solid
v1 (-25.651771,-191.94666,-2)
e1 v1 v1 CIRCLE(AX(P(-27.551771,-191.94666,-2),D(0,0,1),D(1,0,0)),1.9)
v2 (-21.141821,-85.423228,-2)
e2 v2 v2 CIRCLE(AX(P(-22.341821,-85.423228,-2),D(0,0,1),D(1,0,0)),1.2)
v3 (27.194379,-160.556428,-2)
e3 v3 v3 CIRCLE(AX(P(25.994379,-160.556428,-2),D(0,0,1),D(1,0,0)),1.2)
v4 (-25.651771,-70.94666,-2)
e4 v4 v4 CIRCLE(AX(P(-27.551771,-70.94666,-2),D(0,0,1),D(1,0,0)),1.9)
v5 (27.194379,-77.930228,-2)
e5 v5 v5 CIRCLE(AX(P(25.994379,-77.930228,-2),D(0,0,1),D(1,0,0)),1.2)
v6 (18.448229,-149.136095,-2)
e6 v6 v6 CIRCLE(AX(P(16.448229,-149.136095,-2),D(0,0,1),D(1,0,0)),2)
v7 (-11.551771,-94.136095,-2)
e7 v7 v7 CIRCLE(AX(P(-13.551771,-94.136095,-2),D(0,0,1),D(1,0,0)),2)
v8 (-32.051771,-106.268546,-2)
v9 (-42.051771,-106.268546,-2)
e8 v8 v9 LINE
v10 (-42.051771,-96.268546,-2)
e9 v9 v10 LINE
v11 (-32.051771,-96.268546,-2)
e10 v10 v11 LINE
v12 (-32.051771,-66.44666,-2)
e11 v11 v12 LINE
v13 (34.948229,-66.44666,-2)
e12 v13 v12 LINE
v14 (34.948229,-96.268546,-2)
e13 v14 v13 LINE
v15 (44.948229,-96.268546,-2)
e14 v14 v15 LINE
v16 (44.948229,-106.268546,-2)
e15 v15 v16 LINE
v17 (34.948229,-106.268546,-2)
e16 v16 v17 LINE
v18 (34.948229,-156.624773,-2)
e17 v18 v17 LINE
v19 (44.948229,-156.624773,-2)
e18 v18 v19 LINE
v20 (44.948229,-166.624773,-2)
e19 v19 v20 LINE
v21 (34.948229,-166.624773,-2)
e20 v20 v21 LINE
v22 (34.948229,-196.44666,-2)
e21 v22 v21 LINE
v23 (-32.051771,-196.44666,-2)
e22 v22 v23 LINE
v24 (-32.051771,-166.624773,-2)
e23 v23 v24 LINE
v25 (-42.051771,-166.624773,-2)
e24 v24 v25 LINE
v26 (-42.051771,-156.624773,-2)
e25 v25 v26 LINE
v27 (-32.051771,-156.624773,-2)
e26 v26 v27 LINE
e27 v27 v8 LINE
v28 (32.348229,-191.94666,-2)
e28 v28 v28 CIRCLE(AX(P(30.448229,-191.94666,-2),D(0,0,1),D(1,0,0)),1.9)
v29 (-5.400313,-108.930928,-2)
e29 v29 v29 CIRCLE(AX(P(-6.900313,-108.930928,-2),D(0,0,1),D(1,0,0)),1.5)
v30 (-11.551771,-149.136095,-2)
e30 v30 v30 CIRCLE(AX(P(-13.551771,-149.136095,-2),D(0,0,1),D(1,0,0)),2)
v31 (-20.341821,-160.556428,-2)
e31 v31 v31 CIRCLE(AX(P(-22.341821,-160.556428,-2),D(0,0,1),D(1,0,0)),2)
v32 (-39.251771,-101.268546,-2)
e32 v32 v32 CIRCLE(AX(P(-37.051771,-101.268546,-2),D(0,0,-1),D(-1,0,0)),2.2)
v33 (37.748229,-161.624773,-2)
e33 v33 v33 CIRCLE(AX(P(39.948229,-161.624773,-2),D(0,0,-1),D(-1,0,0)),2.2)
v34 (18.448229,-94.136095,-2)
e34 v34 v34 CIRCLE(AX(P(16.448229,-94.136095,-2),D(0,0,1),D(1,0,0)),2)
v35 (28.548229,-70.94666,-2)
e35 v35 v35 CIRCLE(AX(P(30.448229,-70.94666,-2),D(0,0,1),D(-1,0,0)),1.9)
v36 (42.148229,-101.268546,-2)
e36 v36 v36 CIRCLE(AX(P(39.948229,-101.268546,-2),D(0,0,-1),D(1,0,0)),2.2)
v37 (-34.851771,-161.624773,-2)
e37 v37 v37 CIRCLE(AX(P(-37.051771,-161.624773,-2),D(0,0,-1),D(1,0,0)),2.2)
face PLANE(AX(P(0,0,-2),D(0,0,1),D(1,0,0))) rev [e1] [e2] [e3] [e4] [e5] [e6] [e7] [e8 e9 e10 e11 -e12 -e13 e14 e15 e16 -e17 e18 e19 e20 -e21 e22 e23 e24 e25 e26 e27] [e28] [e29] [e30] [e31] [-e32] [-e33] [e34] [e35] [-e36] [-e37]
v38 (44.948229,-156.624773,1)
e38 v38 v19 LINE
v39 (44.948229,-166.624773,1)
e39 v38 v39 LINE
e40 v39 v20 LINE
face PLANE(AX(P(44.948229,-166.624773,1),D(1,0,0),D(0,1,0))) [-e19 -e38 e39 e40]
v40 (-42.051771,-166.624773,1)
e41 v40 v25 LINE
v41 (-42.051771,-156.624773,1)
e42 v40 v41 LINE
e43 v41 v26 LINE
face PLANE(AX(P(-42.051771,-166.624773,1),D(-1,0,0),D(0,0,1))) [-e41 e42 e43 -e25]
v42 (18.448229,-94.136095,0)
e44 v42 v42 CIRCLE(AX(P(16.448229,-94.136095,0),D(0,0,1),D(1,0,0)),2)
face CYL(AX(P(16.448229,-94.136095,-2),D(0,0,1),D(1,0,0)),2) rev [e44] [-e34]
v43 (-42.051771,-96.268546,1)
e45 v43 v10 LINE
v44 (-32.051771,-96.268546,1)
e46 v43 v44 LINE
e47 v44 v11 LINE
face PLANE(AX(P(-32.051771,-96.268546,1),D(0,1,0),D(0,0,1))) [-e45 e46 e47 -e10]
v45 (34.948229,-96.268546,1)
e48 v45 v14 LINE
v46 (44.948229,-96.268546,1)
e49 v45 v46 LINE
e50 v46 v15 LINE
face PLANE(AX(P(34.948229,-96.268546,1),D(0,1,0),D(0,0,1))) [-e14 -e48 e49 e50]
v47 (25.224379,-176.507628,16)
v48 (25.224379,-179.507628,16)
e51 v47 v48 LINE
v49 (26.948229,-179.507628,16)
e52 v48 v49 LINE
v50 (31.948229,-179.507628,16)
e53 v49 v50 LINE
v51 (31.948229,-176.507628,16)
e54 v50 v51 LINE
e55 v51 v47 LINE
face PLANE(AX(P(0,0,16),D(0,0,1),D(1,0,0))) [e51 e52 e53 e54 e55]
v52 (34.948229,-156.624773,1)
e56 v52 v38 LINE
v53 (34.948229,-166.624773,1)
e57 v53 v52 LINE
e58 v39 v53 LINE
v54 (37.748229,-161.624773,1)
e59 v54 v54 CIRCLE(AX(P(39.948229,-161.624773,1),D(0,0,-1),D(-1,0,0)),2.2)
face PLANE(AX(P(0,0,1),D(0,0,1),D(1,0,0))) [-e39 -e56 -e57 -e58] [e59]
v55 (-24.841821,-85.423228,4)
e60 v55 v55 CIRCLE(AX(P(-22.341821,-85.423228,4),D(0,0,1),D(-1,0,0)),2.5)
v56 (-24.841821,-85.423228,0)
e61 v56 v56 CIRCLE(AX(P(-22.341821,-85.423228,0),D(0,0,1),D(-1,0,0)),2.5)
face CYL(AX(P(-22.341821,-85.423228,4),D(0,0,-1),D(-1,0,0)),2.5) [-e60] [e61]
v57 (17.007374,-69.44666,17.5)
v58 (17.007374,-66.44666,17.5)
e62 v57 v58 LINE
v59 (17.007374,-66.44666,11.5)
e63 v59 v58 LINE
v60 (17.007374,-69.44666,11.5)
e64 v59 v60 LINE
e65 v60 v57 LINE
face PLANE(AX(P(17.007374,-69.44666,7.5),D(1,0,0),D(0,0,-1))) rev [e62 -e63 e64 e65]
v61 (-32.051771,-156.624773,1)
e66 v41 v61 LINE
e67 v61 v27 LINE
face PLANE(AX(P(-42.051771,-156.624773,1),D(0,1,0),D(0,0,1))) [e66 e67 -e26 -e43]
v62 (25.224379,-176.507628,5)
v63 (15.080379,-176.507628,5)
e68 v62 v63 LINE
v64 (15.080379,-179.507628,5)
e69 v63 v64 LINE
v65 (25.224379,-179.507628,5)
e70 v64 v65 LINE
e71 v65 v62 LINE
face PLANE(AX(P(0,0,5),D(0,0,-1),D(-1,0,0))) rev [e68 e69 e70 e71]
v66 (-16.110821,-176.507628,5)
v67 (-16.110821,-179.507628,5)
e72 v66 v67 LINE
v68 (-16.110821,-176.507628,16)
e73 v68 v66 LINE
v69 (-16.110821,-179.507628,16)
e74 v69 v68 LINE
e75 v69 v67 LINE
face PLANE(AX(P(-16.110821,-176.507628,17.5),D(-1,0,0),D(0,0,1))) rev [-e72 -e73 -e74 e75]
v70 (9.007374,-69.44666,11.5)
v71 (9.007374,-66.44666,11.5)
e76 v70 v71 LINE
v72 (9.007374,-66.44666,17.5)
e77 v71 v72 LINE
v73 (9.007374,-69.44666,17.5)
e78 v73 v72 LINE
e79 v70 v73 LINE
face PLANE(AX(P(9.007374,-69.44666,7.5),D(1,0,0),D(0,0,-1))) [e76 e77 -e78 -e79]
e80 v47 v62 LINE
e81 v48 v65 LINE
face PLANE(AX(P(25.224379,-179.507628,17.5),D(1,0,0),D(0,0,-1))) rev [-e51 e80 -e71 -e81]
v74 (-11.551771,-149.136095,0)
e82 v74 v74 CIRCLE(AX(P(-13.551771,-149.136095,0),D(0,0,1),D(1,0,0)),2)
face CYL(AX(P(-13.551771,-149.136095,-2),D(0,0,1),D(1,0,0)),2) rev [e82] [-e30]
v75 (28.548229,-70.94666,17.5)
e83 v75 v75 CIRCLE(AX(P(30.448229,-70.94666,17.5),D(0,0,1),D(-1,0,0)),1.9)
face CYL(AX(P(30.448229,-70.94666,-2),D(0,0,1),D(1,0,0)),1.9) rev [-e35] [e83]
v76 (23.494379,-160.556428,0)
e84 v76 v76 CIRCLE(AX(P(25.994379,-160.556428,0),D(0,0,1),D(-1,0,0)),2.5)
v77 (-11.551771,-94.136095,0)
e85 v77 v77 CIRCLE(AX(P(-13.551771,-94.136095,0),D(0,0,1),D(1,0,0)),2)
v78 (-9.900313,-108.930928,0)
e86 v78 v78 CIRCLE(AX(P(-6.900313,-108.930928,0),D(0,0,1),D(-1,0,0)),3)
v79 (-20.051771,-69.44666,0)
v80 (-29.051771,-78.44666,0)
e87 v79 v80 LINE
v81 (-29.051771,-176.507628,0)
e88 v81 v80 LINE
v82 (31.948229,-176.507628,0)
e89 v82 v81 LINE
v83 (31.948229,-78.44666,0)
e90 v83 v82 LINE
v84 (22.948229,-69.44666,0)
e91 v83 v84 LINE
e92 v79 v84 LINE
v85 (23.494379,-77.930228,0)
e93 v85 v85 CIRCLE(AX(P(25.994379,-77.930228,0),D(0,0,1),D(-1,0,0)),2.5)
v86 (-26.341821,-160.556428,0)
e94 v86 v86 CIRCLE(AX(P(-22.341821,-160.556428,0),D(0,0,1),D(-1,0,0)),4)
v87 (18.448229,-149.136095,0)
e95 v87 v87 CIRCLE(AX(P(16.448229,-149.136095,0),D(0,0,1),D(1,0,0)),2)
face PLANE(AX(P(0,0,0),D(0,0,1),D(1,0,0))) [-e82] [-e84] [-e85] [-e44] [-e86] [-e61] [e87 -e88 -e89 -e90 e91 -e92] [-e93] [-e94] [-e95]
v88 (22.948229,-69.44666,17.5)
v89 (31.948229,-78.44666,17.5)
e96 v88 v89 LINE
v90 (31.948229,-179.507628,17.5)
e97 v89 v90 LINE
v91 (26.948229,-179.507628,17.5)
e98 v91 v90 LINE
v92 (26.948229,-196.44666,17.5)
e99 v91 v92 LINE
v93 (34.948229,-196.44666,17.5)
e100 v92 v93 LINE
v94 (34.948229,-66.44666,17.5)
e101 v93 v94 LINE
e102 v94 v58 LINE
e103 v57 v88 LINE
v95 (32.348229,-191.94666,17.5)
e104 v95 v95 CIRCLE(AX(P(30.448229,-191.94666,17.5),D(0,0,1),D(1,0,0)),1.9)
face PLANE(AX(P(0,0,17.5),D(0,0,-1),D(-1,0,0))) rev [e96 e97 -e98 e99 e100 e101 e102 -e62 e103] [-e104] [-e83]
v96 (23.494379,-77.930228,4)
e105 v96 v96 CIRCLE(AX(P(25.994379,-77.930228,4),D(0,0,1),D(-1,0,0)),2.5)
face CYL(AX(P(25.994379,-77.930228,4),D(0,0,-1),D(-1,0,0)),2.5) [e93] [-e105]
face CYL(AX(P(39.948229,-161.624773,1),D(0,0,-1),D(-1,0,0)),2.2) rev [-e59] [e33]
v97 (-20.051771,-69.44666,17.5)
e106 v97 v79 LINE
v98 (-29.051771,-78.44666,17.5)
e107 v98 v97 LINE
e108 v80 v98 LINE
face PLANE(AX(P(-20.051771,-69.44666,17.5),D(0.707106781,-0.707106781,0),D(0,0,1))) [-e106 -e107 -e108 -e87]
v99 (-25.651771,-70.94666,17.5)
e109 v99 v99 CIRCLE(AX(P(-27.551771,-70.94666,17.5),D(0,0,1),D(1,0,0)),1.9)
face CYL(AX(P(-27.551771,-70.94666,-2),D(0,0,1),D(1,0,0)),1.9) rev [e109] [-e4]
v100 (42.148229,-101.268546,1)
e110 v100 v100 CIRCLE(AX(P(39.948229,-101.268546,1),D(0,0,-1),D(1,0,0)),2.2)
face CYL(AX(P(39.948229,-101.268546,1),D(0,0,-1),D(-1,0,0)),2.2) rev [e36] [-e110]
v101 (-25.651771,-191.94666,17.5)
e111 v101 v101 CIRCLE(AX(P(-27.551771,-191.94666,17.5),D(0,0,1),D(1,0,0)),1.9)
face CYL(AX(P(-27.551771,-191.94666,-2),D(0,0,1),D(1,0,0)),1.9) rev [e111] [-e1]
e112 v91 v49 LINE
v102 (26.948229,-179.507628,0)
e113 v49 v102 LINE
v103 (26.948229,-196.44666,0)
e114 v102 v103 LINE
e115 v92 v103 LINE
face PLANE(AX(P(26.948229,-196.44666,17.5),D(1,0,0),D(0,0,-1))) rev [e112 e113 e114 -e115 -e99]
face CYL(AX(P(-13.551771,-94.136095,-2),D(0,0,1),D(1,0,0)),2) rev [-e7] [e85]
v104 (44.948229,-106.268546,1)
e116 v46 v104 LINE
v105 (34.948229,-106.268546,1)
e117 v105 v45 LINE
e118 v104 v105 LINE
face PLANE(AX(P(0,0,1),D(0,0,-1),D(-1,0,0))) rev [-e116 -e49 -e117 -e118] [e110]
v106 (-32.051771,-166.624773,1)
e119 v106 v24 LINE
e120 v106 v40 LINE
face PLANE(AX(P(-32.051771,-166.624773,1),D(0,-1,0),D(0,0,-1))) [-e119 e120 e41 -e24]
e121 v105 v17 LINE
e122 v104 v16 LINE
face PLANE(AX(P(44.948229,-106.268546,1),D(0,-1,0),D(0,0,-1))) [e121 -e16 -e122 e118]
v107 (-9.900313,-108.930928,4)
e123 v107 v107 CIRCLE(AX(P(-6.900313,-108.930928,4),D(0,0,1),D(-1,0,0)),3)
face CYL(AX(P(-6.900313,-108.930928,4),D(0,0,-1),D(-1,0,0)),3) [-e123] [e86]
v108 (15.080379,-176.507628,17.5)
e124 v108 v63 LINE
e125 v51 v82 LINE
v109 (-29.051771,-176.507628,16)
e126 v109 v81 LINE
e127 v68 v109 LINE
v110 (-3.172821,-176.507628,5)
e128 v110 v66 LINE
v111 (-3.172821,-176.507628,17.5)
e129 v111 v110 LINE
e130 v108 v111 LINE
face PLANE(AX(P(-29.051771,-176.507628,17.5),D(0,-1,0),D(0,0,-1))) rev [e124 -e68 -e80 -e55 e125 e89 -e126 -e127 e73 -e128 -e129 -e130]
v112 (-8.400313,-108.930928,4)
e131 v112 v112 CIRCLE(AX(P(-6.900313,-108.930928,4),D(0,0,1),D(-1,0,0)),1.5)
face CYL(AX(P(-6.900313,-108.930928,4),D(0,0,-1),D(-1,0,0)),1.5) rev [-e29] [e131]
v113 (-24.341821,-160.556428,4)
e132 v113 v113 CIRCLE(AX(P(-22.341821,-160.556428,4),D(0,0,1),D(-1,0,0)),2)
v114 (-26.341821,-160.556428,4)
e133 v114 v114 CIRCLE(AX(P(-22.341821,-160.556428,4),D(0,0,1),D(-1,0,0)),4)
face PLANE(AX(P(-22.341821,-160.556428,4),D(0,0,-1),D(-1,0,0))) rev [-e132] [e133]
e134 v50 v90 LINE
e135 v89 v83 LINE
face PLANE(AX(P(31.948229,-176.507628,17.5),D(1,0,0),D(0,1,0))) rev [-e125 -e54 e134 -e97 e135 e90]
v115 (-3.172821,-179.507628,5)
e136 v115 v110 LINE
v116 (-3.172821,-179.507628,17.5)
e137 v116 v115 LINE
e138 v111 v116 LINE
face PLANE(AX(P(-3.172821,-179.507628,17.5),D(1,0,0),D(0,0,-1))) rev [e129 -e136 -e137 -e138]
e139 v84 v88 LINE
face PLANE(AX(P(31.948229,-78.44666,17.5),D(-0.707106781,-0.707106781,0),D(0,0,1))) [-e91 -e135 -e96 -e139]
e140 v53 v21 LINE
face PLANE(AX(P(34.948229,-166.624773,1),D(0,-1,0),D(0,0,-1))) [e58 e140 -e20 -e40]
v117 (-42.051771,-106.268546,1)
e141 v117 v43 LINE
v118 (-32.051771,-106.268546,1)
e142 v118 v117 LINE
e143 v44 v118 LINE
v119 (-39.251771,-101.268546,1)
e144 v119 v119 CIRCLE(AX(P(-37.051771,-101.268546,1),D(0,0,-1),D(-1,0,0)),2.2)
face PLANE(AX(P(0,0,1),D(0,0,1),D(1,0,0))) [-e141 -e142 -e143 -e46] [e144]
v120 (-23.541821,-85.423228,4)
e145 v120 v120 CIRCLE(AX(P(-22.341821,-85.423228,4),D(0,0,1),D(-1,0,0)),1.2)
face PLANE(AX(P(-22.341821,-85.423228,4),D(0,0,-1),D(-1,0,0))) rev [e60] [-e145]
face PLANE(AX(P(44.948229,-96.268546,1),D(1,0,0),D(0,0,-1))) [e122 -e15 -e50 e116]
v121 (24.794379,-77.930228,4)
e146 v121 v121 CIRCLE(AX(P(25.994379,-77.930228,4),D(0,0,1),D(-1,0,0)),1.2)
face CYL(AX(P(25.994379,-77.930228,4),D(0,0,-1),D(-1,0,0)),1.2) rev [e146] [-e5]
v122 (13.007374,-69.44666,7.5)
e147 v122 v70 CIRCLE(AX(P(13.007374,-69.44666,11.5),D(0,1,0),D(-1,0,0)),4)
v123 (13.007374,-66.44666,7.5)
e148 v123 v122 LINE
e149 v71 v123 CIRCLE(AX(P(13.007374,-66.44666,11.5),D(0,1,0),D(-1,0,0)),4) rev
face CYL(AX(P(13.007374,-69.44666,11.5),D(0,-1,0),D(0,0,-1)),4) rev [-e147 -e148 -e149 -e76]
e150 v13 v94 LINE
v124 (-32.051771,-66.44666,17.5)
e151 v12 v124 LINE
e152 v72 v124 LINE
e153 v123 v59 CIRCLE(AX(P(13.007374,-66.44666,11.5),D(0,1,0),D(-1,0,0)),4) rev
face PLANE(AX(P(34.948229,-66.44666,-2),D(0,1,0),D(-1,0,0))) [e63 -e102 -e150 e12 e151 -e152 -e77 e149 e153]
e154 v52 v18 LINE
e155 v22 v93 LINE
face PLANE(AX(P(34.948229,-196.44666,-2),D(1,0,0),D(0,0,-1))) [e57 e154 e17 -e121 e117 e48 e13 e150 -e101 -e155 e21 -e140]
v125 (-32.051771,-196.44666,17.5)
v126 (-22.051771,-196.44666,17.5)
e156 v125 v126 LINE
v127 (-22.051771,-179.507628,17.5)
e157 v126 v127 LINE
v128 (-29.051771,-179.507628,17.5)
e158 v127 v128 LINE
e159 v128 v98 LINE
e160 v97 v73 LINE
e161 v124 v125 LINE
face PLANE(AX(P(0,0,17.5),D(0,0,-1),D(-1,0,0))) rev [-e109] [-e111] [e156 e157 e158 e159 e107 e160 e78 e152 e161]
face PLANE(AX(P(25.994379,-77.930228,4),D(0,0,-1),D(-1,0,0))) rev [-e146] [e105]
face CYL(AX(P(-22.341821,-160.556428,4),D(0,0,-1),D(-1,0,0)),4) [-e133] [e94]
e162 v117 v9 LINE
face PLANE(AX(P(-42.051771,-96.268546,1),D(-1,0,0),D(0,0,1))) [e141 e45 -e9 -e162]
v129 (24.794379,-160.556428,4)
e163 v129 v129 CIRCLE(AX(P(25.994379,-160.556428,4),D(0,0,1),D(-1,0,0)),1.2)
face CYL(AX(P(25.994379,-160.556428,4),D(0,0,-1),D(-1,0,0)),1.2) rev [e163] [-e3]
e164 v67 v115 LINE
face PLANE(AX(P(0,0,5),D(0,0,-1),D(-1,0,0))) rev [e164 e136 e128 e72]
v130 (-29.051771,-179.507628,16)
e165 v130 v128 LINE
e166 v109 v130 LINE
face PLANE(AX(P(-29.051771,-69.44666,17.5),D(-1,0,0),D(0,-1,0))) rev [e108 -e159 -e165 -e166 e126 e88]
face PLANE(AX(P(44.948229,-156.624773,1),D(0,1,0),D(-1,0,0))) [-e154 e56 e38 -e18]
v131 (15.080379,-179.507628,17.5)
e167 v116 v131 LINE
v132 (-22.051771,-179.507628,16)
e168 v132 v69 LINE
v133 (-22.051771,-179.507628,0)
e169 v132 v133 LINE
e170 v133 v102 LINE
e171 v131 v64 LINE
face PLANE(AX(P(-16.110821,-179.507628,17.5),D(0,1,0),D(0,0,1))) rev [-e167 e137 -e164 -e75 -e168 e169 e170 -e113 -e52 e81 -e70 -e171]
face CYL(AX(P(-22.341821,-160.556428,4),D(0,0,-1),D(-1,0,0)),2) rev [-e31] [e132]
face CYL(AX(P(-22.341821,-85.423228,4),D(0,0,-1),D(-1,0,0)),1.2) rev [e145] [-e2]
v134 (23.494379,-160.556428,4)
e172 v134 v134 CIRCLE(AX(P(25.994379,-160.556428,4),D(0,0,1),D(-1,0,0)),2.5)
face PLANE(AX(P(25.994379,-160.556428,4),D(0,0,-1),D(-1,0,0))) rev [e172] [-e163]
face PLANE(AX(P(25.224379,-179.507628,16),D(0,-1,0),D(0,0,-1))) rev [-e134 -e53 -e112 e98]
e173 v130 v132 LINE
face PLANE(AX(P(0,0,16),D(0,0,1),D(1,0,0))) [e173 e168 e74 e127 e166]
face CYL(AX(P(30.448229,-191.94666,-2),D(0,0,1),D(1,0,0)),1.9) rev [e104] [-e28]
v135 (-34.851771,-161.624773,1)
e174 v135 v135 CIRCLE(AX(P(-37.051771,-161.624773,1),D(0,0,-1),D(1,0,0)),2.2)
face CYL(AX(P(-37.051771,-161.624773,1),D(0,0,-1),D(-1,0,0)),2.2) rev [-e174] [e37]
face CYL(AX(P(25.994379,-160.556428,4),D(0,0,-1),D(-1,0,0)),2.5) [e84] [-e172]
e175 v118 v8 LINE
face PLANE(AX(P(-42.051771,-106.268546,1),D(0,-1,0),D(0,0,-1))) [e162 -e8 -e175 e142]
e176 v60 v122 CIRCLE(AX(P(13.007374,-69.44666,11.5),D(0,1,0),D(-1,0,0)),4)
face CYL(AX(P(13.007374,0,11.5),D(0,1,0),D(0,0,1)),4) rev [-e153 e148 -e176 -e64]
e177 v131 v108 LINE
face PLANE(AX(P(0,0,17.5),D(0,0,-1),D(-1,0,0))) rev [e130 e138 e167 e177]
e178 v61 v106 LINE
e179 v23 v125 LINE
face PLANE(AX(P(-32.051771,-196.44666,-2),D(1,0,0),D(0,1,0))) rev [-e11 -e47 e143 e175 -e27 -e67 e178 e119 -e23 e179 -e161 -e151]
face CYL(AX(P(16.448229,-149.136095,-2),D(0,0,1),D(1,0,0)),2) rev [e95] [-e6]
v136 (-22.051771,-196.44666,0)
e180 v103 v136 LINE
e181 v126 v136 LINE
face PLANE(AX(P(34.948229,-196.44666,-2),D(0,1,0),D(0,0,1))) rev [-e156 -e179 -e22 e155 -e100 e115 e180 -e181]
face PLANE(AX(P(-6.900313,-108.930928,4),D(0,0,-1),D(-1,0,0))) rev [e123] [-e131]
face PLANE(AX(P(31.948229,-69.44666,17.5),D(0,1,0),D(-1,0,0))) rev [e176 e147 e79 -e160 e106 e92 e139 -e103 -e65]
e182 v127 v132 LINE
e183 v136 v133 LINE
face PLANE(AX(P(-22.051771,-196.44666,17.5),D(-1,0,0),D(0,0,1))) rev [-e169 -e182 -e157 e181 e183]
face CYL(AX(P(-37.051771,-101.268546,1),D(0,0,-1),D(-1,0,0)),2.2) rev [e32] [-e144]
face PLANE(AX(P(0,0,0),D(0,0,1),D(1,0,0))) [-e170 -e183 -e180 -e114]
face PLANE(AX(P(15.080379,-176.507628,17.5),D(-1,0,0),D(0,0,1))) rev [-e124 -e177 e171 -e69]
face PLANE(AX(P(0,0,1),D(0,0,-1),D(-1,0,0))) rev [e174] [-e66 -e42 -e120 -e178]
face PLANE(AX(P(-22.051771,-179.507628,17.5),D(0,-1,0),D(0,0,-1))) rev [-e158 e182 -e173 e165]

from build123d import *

# Parameters (mm, degrees)
SKETCH1_W           = 67
SKETCH1_H           = 130
BOSS_EXTRUDE1_DEPTH = 2
SKETCH2_W           = 18.2532
SKETCH2_H           = 3
BOSS_EXTRUDE2_DEPTH = 17.5
SKETCH3_R           = 3
SKETCH3_R_2         = 1.5
SKETCH3_R_3         = 2.5
SKETCH3_R_4         = 1.2
SKETCH3_R_5         = 4
SKETCH3_R_6         = 2
BOSS_EXTRUDE3_DEPTH = 4
SKETCH4_W           = 12.938
SKETCH4_H           = 3
SKETCH4_W_2         = 10.144
BOSS_EXTRUDE4_DEPTH = 5
SKETCH5_R           = 2
CUT_EXTRUDE1_DEPTH  = 201.297076365
SKETCH6_W           = 12.940950003
SKETCH6_H           = 3
CUT_EXTRUDE2_DEPTH  = 1.5
SKETCH7_W           = 10
SKETCH7_H           = 16.939031541
SKETCH7_W_2         = 8
BOSS_EXTRUDE5_DEPTH = 17.5
SKETCH8_W           = 6.723849997
SKETCH8_H           = 3
CUT_EXTRUDE3_DEPTH  = 1.5
CHAMFER1_SIZE       = 9
SKETCH10_R          = 1.9
CUT_EXTRUDE4_DEPTH  = 201.481716873
SKETCH11_R          = 2
CUT_EXTRUDE5_DEPTH  = 201.297076365
SKETCH13_W          = 8
SKETCH13_H          = 3
CUT_EXTRUDE6_DEPTH  = 10
FILLET1_R           = 4
SKETCH14_W          = 10
SKETCH14_H          = 10
SKETCH14_R          = 2.2
BOSS_EXTRUDE6_DEPTH = 3
SKETCH15_R          = 1.2
SKETCH15_R_2        = 1.5
CUT_EXTRUDE7_DEPTH  = 203.281693166


with BuildPart() as part:
    # Sketch1 → Boss-Extrude1 (new body)
    with BuildSketch(Plane.XY):
        with Locations((1.448229487, -131.44665957)):
            Rectangle(SKETCH1_W, SKETCH1_H)
    extrude(amount=-BOSS_EXTRUDE1_DEPTH)

    # Sketch2 → Boss-Extrude2 (add)
    with BuildSketch(Plane.XY):
        Polygon((-32.051770513, -66.44665957), (34.948229487, -66.44665957), (34.948229487, -179.507628029), (25.22437949, -179.507628029), (25.22437949, -176.507628029), (31.948229487, -176.507628029), (31.948229487, -69.44665957), (-29.051770513, -69.44665957), (-29.051770513, -176.507628029), (-16.11082051, -176.507628029), (-16.11082051, -179.507628029), (-32.051770513, -179.507628029), align=None)
        with Locations((5.95377949, -178.007628029)):
            Rectangle(SKETCH2_W, SKETCH2_H)
    extrude(amount=BOSS_EXTRUDE2_DEPTH)

    # Sketch3 → Boss-Extrude3 (add)
    # profile 1 of 5: a face of its own
    with BuildSketch(Plane.XY):
        with Locations(Location((-6.90031328, -108.930928029, 0), (0, 0, 180))):
            Circle(SKETCH3_R)
        with Locations(Location((-6.90031328, -108.930928029, 0), (0, 0, 180))):
            Circle(SKETCH3_R_2, mode=Mode.SUBTRACT)
    # profile 2 of 5: a face of its own
    with BuildSketch(Plane.XY):
        with Locations(Location((-22.341820513, -85.423228029, 0), (0, 0, 180))):
            Circle(SKETCH3_R_3)
        with Locations(Location((-22.341820513, -85.423228029, 0), (0, 0, 180))):
            Circle(SKETCH3_R_4, mode=Mode.SUBTRACT)
    # profile 3 of 5: a face of its own
    with BuildSketch(Plane.XY):
        with Locations(Location((25.994379487, -77.930228029, 0), (0, 0, 180))):
            Circle(SKETCH3_R_3)
        with Locations(Location((25.994379487, -77.930228029, 0), (0, 0, 180))):
            Circle(SKETCH3_R_4, mode=Mode.SUBTRACT)
    # profile 4 of 5: a face of its own
    with BuildSketch(Plane.XY):
        with Locations(Location((25.994379487, -160.556428029, 0), (0, 0, 180))):
            Circle(SKETCH3_R_3)
        with Locations(Location((25.994379487, -160.556428029, 0), (0, 0, 180))):
            Circle(SKETCH3_R_4, mode=Mode.SUBTRACT)
    # profile 5 of 5: a face of its own
    with BuildSketch(Plane.XY):
        with Locations(Location((-22.341820513, -160.556428029, 0), (0, 0, 180))):
            Circle(SKETCH3_R_5)
        with Locations(Location((-22.341820513, -160.556428029, 0), (0, 0, 180))):
            Circle(SKETCH3_R_6, mode=Mode.SUBTRACT)
    extrude(amount=BOSS_EXTRUDE3_DEPTH)

    # Sketch4 → Boss-Extrude4 (add)
    with BuildSketch(Plane.XY):
        with Locations((-9.64182051, -178.007628029)):
            Rectangle(SKETCH4_W, SKETCH4_H)
        with Locations((20.15237949, -178.007628029)):
            Rectangle(SKETCH4_W_2, SKETCH4_H)
    extrude(amount=BOSS_EXTRUDE4_DEPTH)

    # Sketch5 → Cut-Extrude1 (cut, through all)
    with BuildSketch(Plane.XY):
        with Locations((-13.551770513, -94.136094707)):
            Circle(SKETCH5_R)
        with Locations((16.448229487, -94.136094707)):
            Circle(SKETCH5_R)
        with Locations((-13.551770513, -149.136094707)):
            Circle(SKETCH5_R)
        with Locations((16.448229487, -149.136094707)):
            Circle(SKETCH5_R)
    extrude(amount=-CUT_EXTRUDE1_DEPTH, mode=Mode.SUBTRACT)

    # Sketch6 → Cut-Extrude2 (cut)
    with BuildSketch(Plane.XY.offset(17.5)):
        with Locations((-22.581295512, -178.007628029)):
            Rectangle(SKETCH6_W, SKETCH6_H)
    extrude(amount=-CUT_EXTRUDE2_DEPTH, mode=Mode.SUBTRACT)

    # Sketch7 → Boss-Extrude5 (add)
    with BuildSketch(Plane.XY):
        with Locations((-27.051770513, -187.9771438)):
            Rectangle(SKETCH7_W, SKETCH7_H)
        with Locations((30.948229487, -187.9771438)):
            Rectangle(SKETCH7_W_2, SKETCH7_H)
    extrude(amount=BOSS_EXTRUDE5_DEPTH)

    # Sketch8 → Cut-Extrude3 (cut)
    with BuildSketch(Plane.XY.offset(17.5)):
        with Locations((28.586304489, -178.007628029)):
            Rectangle(SKETCH8_W, SKETCH8_H)
    extrude(amount=-CUT_EXTRUDE3_DEPTH, mode=Mode.SUBTRACT)

    # Chamfer1
    chamfer1_edges = [part.edges().sort_by_distance(p)[0] for p in [
        (-29.051770513, -69.44665957, 8.75),
        (31.948229487, -69.44665957, 8.75),
    ]]
    chamfer(chamfer1_edges, length=CHAMFER1_SIZE)

    # Sketch10 → Cut-Extrude4 (cut, through all)
    with BuildSketch(Plane.XY.offset(17.5)):
        with Locations((-27.551770513, -70.94665957)):
            Circle(SKETCH10_R)
        with Locations(Location((30.448229487, -70.94665957, 0), (0, 0, 180))):
            Circle(SKETCH10_R)
        with Locations((-27.551770513, -191.94665957)):
            Circle(SKETCH10_R)
        with Locations((30.448229487, -191.94665957)):
            Circle(SKETCH10_R)
    extrude(amount=-CUT_EXTRUDE4_DEPTH, mode=Mode.SUBTRACT)

    # Sketch11 → Cut-Extrude5 (cut, through all)
    with BuildSketch(Plane.XY):
        with Locations(Location((-22.341820513, -160.556428029, 0), (0, 0, 180))):
            Circle(SKETCH11_R)
    extrude(amount=-CUT_EXTRUDE5_DEPTH, mode=Mode.SUBTRACT)

    # Sketch13 → Cut-Extrude6 (cut)
    with BuildSketch(Plane.XY.offset(17.5)):
        with Locations((13.007373808, -67.94665957)):
            Rectangle(SKETCH13_W, SKETCH13_H)
    extrude(amount=-CUT_EXTRUDE6_DEPTH, mode=Mode.SUBTRACT)

    # Fillet1
    fillet1_edges = [part.edges().sort_by_distance(p)[0] for p in [
        (17.007373808, -67.94665957, 7.5),
        (9.007373808, -67.94665957, 7.5),
    ]]
    fillet(fillet1_edges, radius=FILLET1_R - 0.0001)  # a hair under: the kernel refuses the full size

    # Sketch14 → Boss-Extrude6 (add)
    # profile 1 of 4: a face of its own
    with BuildSketch(Plane(origin=(0, 0, -2), x_dir=(-1, 0, 0), z_dir=(0, 0, -1))):
        with Locations((37.051770513, -101.268546353)):
            Rectangle(SKETCH14_W, SKETCH14_H)
        with Locations((37.051770513, -101.268546353)):
            Circle(SKETCH14_R, mode=Mode.SUBTRACT)
    # profile 2 of 4: a face of its own
    with BuildSketch(Plane(origin=(0, 0, -2), x_dir=(-1, 0, 0), z_dir=(0, 0, -1))):
        with Locations((-39.948229487, -101.268546353)):
            Rectangle(SKETCH14_W, SKETCH14_H)
        with Locations(Location((-39.948229487, -101.268546353, 0), (0, 0, 180))):
            Circle(SKETCH14_R, mode=Mode.SUBTRACT)
    # profile 3 of 4: a face of its own
    with BuildSketch(Plane(origin=(0, 0, -2), x_dir=(-1, 0, 0), z_dir=(0, 0, -1))):
        with Locations((-39.948229487, -161.624772787)):
            Rectangle(SKETCH14_W, SKETCH14_H)
        with Locations((-39.948229487, -161.624772787)):
            Circle(SKETCH14_R, mode=Mode.SUBTRACT)
    # profile 4 of 4: a face of its own
    with BuildSketch(Plane(origin=(0, 0, -2), x_dir=(-1, 0, 0), z_dir=(0, 0, -1))):
        with Locations((37.051770513, -161.624772787)):
            Rectangle(SKETCH14_W, SKETCH14_H)
        with Locations(Location((37.051770513, -161.624772787, 0), (0, 0, 180))):
            Circle(SKETCH14_R, mode=Mode.SUBTRACT)
    extrude(amount=-BOSS_EXTRUDE6_DEPTH)

    # Sketch15 → Cut-Extrude7 (cut, through all)
    with BuildSketch(Plane.XY):
        with Locations(Location((-22.341820513, -85.423228029, 0), (0, 0, 180))):
            Circle(SKETCH15_R)
        with Locations(Location((25.994379487, -77.930228029, 0), (0, 0, 180))):
            Circle(SKETCH15_R)
        with Locations(Location((-6.90031328, -108.930928029, 0), (0, 0, 180))):
            Circle(SKETCH15_R_2)
        with Locations(Location((25.994379487, -160.556428029, 0), (0, 0, 180))):
            Circle(SKETCH15_R)
    extrude(amount=-CUT_EXTRUDE7_DEPTH, mode=Mode.SUBTRACT)


solid = part.part
